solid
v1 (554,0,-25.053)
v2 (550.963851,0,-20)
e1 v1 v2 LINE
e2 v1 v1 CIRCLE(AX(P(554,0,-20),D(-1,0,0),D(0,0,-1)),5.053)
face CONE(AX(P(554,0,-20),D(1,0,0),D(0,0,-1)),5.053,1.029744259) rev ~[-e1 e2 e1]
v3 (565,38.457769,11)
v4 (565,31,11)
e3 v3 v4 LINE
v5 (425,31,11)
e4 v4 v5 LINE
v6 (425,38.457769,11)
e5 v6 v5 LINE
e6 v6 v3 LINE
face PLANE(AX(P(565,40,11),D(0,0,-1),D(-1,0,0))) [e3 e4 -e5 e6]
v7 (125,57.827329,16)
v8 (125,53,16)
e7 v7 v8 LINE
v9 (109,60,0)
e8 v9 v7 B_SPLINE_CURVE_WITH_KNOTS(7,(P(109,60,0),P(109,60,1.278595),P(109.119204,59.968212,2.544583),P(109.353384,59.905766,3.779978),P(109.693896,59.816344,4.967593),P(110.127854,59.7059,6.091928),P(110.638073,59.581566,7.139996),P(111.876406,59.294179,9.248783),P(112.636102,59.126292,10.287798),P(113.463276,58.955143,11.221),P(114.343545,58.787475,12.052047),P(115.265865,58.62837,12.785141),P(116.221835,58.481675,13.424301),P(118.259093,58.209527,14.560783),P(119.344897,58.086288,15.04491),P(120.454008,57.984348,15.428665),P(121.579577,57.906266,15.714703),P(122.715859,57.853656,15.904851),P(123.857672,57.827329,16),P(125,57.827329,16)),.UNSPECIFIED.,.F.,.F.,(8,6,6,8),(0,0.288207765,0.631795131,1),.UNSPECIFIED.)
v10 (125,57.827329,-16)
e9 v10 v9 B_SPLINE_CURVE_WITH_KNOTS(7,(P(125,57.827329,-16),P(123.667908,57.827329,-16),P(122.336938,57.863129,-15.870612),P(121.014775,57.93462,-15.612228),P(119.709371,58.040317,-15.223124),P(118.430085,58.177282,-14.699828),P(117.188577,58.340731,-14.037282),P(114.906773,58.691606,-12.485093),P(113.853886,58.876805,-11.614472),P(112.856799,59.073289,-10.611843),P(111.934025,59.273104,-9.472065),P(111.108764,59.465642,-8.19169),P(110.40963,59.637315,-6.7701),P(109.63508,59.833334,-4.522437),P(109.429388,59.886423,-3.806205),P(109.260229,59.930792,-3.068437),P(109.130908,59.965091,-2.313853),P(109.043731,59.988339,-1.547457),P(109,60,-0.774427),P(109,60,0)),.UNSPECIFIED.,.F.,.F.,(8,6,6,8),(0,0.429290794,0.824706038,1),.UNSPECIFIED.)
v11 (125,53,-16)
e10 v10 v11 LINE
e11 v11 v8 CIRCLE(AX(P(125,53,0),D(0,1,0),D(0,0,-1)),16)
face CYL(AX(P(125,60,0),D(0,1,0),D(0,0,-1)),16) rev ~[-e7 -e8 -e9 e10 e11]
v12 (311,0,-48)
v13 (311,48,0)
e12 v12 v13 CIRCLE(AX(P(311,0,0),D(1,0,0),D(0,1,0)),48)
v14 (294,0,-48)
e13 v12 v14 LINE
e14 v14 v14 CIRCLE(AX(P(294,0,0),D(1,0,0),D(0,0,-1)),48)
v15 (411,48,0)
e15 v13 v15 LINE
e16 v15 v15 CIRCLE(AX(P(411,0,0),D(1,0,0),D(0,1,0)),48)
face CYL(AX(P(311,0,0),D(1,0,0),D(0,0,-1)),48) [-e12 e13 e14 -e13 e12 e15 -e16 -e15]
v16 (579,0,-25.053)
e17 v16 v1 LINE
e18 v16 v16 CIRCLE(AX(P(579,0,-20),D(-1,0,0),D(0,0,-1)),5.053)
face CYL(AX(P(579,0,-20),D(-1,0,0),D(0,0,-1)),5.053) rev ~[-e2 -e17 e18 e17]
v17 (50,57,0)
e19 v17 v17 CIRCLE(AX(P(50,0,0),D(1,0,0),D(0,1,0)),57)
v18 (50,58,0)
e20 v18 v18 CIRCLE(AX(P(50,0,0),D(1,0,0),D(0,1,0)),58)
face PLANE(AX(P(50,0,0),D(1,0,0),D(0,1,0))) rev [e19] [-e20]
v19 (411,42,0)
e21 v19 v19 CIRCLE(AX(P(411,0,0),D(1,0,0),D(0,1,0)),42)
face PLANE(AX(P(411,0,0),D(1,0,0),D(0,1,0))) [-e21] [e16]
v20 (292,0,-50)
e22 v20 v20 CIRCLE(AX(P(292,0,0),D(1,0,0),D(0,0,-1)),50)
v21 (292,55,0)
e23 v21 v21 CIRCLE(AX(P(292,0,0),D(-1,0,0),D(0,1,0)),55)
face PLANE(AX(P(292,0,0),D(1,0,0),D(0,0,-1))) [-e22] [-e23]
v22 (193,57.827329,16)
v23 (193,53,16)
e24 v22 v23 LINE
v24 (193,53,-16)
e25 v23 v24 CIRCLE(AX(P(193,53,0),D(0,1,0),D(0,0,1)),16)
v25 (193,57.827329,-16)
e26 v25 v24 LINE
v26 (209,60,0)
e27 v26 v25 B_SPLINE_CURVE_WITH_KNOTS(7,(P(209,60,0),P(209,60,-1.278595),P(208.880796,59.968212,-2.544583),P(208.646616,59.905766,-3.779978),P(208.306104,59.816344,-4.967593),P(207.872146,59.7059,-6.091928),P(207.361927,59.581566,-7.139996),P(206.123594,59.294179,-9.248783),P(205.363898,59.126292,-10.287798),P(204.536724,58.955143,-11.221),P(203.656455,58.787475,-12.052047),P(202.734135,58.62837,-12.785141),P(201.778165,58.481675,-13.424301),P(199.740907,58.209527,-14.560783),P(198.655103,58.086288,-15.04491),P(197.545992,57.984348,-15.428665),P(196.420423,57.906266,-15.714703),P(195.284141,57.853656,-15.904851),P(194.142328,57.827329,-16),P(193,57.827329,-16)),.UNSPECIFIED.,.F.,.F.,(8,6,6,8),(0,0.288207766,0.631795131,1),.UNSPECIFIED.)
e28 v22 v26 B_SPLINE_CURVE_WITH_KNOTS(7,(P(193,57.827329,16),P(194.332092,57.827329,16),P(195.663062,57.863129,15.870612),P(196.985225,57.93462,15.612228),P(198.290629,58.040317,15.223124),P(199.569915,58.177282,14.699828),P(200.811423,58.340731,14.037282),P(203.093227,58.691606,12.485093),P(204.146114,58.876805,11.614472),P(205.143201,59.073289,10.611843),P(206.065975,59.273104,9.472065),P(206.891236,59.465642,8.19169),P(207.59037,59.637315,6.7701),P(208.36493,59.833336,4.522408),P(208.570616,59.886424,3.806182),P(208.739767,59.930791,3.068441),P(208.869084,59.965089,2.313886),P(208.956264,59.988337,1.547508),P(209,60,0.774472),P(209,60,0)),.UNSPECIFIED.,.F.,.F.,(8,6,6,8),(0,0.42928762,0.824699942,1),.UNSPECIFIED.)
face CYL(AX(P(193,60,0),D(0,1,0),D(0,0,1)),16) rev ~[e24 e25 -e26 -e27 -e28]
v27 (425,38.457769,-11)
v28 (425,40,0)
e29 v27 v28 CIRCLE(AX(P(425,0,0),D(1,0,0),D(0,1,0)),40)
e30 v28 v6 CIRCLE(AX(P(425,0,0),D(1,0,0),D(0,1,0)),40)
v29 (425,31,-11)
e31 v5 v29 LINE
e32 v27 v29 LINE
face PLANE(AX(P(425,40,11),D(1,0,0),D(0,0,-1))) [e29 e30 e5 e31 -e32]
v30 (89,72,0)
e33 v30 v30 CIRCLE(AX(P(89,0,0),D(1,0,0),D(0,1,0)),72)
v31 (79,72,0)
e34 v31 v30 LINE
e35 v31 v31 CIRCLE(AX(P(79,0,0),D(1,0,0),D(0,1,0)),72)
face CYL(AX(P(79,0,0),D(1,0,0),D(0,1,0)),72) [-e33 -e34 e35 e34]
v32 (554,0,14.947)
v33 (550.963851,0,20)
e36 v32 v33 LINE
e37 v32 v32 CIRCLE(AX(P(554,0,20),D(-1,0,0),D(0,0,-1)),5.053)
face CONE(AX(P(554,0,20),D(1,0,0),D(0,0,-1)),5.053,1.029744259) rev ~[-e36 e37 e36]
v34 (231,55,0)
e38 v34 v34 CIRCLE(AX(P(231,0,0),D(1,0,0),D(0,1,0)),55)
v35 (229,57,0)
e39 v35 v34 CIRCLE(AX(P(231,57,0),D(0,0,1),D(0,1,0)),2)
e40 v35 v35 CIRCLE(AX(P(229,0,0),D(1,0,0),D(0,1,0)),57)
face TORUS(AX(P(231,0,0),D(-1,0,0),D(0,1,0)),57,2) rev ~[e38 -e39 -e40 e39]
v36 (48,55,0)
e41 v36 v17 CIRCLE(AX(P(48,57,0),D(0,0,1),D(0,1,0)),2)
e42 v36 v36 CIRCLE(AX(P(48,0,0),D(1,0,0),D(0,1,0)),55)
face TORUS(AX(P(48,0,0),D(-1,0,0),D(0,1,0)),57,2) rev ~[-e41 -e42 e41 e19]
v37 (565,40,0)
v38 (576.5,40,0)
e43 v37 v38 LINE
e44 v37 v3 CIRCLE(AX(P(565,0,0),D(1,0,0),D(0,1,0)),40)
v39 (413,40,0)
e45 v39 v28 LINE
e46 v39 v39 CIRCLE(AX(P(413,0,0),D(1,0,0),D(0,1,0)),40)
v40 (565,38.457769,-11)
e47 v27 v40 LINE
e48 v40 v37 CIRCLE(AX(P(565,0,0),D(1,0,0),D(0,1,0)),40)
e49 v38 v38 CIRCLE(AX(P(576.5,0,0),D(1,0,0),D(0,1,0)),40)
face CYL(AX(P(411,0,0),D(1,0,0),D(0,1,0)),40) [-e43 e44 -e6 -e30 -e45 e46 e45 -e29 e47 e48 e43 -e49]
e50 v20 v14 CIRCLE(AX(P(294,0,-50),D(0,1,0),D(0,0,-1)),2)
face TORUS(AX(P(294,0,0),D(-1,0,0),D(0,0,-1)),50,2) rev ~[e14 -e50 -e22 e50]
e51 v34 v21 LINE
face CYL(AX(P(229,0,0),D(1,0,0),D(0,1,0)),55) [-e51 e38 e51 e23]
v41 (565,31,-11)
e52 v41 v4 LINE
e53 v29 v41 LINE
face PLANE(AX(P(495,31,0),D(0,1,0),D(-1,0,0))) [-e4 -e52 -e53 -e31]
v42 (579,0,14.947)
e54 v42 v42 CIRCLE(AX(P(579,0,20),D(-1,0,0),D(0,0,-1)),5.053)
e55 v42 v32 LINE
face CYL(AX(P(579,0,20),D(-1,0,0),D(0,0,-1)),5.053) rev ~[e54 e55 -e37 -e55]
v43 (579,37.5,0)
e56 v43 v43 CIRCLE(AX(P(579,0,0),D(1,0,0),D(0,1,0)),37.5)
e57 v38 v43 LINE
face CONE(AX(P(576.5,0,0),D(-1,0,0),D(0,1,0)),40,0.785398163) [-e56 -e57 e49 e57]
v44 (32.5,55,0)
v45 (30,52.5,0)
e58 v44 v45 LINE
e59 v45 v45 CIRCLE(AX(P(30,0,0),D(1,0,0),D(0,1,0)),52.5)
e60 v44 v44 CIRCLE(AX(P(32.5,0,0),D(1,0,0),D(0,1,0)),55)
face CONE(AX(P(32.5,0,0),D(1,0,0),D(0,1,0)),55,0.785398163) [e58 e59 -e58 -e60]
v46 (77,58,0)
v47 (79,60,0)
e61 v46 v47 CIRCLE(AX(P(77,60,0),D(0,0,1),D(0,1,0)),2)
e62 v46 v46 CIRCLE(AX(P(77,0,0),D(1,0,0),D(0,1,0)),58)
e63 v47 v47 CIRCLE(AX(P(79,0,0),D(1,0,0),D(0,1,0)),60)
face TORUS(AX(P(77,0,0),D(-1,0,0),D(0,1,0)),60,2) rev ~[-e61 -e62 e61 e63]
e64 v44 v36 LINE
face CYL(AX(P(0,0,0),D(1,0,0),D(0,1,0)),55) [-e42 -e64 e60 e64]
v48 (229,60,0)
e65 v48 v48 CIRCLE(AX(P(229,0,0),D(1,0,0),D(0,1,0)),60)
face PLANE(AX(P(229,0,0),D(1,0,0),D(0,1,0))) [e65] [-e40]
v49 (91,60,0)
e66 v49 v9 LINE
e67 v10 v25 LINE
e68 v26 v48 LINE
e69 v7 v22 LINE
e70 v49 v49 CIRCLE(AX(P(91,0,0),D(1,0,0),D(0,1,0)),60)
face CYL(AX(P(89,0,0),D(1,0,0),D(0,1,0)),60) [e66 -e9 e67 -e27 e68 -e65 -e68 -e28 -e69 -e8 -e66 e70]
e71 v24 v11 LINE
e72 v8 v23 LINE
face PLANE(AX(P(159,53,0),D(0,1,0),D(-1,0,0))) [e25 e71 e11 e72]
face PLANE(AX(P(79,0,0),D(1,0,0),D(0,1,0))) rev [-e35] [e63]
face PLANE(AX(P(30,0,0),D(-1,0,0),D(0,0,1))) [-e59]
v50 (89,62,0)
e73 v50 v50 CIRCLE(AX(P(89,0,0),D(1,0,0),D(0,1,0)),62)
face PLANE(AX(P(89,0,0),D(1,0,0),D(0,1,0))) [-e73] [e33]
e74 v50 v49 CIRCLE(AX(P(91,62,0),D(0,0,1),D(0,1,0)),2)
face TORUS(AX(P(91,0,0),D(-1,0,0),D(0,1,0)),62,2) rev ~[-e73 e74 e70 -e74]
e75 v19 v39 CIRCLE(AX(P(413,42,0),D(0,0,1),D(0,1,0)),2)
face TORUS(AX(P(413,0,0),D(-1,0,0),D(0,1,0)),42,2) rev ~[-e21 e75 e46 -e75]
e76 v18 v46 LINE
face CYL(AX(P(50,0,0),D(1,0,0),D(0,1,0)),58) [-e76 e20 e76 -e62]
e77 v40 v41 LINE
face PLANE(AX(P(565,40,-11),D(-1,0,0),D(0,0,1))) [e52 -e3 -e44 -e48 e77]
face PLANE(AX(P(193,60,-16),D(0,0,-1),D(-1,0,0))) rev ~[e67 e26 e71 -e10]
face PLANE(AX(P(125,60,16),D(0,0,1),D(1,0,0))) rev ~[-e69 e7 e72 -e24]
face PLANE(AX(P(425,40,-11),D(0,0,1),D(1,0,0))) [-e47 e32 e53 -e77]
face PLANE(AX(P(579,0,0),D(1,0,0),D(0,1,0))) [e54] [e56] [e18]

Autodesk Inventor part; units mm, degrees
ref_plane "起始平面" through (0, 0, 0) normal (1, 0, 0) x (0, 1, 0)
sketch "主草图" plane through (0, 0, 0) normal (0, 0, 1) x (1, 0, 0)
  line L0 (0, 0) -> (579, 0)
  line L1 (0, 0) -> (0, 55)
  line L2 (0, 55) -> (50, 55)
  line L3 (50, 55) -> (50, 58)
  line L4 (50, 58) -> (79, 58)
  line L5 (79, 58) -> (79, 72)
  line L6 (89, 72) -> (89, 60)
  line L7 (79, 72) -> (89, 72)
  line L8 (229, 60) -> (229, 55)
  line L9 (89, 60) -> (229, 60)
  line L10 (311, 55) -> (311, 48)
  line L11 (229, 55) -> (311, 55)
  line L12 (411, 48) -> (411, 40)
  line L13 (311, 48) -> (411, 48)
  line L14 (579, 40) -> (579, 0)
  line L15 (411, 40) -> (579, 40)
  dimension "d3" = 110
  dimension "d4" = 116
  dimension "d5" = 144
  dimension "d6" = 120
  dimension "d7" = 110
  dimension "d8" = 96
  dimension "d9" = 80
revolve "旋转1" add sketch "主草图" angle 360 about axis through (0, 0, 0) along (1, 0, 0)
sketch "草图6" plane through (311, 0, 0) normal (1, 0, 0) x (0, 0, -1)
  circle A0 centre (0, 0) radius 48 projected
  circle A1 centre (0, 0) radius 48 projected
  circle A2 centre (0, 0) radius 55 projected
extrude "拉伸4" cut sketch "草图6" against normal blind 19
sketch "草图7" plane through (0, 0, 0) normal (-1, 0, 0) x (0, 0, 1)
  circle A0 centre (0, 0) radius 55 projected
extrude "拉伸5" cut sketch "草图7" against normal blind 30
chamfer "倒角1" distance 2.5 angle 45 2 edges at (579, -40, 0) (30, -55, 0)
fillet "圆角1" radius 2 6 edges at (411, -40, 0) (292, 0, 48) (229, -55, 0) (89, -60, 0) (79, -58, 0) (50, -55, 0)
sketch "草图8" plane through (579, 0, 0) normal (1, 0, 0) x (0, 0, -1)
  point P0 (0, 0)
sketch "草图9" plane through (579, 0, 0) normal (1, 0, 0) x (0, 0, -1)
  line L0 (-100.8, 0) -> (100.8, 0) construction
  line L1 (0, -100.8) -> (0, 100.8) construction
  point P0 (0, 0)
  point P1 (20, 0)
  point P2 (-20, 0)
  dimension "d28" = 40
hole "孔1" at (579, 0, -20) at (579, 0, 20) direction (-1, 0, 0) diameter 10.106 depth 25 tip angle 118 thread size "M12x1.75" designation "M12" class "6H" standard "GB Metric profile"
ref_plane "工作平面1" through (495, 40, 0) normal (0, 1, 0) x (-1, 0, 0)
sketch "草图10" plane through (495, 40, 0) normal (0, 1, 0) x (-1, 0, 0)
  line L0 (-199.8, 0) -> (610.8, 0) construction
  line L1 (84, -48) -> (84, 48) construction
  line L2 (-84, -37.5) -> (-84, 37.5) construction
  line L3 (70, -11) -> (-70, -11)
  line L4 (-70, -11) -> (-70, 11)
  line L5 (-70, 11) -> (70, 11)
  line L6 (70, 11) -> (70, -11)
  point P0 (495, 0)
  dimension "d36" = 140
  dimension "d37" = 22
  dimension "d38" = 14
extrude "拉伸6" cut sketch "草图10" against normal blind 9
ref_plane "工作平面2" through (159, 60, 0) normal (0, 1, 0) x (-1, 0, 0)
sketch "草图11" plane through (159, 60, 0) normal (0, 1, 0) x (-1, 0, 0)
  line L0 (34, 0) -> (-34, 0) construction
  line L1 (34, 16) -> (-34, 16)
  line L2 (-34, -16) -> (34, -16)
  arc A0 (34, -16) -> (34, 16) centre (34, 0) ccw
  arc A1 (-34, 16) -> (-34, -16) centre (-34, 0) ccw
  line L3 (-535.8, 0) -> (274.8, 0) construction
  line L4 (70, -72) -> (70, 72) projected
  line L5 (-70, -60) -> (-70, 60) projected
  point P0 (159, 0)
  point P1 (0, 0)
  dimension "d41" = 100
  dimension "d42" = 32
  dimension "d43" = 36
extrude "拉伸7" cut sketch "草图11" against normal blind 7
equation "\"Length\" = 579"
properties part number "轴" material "Steel"
